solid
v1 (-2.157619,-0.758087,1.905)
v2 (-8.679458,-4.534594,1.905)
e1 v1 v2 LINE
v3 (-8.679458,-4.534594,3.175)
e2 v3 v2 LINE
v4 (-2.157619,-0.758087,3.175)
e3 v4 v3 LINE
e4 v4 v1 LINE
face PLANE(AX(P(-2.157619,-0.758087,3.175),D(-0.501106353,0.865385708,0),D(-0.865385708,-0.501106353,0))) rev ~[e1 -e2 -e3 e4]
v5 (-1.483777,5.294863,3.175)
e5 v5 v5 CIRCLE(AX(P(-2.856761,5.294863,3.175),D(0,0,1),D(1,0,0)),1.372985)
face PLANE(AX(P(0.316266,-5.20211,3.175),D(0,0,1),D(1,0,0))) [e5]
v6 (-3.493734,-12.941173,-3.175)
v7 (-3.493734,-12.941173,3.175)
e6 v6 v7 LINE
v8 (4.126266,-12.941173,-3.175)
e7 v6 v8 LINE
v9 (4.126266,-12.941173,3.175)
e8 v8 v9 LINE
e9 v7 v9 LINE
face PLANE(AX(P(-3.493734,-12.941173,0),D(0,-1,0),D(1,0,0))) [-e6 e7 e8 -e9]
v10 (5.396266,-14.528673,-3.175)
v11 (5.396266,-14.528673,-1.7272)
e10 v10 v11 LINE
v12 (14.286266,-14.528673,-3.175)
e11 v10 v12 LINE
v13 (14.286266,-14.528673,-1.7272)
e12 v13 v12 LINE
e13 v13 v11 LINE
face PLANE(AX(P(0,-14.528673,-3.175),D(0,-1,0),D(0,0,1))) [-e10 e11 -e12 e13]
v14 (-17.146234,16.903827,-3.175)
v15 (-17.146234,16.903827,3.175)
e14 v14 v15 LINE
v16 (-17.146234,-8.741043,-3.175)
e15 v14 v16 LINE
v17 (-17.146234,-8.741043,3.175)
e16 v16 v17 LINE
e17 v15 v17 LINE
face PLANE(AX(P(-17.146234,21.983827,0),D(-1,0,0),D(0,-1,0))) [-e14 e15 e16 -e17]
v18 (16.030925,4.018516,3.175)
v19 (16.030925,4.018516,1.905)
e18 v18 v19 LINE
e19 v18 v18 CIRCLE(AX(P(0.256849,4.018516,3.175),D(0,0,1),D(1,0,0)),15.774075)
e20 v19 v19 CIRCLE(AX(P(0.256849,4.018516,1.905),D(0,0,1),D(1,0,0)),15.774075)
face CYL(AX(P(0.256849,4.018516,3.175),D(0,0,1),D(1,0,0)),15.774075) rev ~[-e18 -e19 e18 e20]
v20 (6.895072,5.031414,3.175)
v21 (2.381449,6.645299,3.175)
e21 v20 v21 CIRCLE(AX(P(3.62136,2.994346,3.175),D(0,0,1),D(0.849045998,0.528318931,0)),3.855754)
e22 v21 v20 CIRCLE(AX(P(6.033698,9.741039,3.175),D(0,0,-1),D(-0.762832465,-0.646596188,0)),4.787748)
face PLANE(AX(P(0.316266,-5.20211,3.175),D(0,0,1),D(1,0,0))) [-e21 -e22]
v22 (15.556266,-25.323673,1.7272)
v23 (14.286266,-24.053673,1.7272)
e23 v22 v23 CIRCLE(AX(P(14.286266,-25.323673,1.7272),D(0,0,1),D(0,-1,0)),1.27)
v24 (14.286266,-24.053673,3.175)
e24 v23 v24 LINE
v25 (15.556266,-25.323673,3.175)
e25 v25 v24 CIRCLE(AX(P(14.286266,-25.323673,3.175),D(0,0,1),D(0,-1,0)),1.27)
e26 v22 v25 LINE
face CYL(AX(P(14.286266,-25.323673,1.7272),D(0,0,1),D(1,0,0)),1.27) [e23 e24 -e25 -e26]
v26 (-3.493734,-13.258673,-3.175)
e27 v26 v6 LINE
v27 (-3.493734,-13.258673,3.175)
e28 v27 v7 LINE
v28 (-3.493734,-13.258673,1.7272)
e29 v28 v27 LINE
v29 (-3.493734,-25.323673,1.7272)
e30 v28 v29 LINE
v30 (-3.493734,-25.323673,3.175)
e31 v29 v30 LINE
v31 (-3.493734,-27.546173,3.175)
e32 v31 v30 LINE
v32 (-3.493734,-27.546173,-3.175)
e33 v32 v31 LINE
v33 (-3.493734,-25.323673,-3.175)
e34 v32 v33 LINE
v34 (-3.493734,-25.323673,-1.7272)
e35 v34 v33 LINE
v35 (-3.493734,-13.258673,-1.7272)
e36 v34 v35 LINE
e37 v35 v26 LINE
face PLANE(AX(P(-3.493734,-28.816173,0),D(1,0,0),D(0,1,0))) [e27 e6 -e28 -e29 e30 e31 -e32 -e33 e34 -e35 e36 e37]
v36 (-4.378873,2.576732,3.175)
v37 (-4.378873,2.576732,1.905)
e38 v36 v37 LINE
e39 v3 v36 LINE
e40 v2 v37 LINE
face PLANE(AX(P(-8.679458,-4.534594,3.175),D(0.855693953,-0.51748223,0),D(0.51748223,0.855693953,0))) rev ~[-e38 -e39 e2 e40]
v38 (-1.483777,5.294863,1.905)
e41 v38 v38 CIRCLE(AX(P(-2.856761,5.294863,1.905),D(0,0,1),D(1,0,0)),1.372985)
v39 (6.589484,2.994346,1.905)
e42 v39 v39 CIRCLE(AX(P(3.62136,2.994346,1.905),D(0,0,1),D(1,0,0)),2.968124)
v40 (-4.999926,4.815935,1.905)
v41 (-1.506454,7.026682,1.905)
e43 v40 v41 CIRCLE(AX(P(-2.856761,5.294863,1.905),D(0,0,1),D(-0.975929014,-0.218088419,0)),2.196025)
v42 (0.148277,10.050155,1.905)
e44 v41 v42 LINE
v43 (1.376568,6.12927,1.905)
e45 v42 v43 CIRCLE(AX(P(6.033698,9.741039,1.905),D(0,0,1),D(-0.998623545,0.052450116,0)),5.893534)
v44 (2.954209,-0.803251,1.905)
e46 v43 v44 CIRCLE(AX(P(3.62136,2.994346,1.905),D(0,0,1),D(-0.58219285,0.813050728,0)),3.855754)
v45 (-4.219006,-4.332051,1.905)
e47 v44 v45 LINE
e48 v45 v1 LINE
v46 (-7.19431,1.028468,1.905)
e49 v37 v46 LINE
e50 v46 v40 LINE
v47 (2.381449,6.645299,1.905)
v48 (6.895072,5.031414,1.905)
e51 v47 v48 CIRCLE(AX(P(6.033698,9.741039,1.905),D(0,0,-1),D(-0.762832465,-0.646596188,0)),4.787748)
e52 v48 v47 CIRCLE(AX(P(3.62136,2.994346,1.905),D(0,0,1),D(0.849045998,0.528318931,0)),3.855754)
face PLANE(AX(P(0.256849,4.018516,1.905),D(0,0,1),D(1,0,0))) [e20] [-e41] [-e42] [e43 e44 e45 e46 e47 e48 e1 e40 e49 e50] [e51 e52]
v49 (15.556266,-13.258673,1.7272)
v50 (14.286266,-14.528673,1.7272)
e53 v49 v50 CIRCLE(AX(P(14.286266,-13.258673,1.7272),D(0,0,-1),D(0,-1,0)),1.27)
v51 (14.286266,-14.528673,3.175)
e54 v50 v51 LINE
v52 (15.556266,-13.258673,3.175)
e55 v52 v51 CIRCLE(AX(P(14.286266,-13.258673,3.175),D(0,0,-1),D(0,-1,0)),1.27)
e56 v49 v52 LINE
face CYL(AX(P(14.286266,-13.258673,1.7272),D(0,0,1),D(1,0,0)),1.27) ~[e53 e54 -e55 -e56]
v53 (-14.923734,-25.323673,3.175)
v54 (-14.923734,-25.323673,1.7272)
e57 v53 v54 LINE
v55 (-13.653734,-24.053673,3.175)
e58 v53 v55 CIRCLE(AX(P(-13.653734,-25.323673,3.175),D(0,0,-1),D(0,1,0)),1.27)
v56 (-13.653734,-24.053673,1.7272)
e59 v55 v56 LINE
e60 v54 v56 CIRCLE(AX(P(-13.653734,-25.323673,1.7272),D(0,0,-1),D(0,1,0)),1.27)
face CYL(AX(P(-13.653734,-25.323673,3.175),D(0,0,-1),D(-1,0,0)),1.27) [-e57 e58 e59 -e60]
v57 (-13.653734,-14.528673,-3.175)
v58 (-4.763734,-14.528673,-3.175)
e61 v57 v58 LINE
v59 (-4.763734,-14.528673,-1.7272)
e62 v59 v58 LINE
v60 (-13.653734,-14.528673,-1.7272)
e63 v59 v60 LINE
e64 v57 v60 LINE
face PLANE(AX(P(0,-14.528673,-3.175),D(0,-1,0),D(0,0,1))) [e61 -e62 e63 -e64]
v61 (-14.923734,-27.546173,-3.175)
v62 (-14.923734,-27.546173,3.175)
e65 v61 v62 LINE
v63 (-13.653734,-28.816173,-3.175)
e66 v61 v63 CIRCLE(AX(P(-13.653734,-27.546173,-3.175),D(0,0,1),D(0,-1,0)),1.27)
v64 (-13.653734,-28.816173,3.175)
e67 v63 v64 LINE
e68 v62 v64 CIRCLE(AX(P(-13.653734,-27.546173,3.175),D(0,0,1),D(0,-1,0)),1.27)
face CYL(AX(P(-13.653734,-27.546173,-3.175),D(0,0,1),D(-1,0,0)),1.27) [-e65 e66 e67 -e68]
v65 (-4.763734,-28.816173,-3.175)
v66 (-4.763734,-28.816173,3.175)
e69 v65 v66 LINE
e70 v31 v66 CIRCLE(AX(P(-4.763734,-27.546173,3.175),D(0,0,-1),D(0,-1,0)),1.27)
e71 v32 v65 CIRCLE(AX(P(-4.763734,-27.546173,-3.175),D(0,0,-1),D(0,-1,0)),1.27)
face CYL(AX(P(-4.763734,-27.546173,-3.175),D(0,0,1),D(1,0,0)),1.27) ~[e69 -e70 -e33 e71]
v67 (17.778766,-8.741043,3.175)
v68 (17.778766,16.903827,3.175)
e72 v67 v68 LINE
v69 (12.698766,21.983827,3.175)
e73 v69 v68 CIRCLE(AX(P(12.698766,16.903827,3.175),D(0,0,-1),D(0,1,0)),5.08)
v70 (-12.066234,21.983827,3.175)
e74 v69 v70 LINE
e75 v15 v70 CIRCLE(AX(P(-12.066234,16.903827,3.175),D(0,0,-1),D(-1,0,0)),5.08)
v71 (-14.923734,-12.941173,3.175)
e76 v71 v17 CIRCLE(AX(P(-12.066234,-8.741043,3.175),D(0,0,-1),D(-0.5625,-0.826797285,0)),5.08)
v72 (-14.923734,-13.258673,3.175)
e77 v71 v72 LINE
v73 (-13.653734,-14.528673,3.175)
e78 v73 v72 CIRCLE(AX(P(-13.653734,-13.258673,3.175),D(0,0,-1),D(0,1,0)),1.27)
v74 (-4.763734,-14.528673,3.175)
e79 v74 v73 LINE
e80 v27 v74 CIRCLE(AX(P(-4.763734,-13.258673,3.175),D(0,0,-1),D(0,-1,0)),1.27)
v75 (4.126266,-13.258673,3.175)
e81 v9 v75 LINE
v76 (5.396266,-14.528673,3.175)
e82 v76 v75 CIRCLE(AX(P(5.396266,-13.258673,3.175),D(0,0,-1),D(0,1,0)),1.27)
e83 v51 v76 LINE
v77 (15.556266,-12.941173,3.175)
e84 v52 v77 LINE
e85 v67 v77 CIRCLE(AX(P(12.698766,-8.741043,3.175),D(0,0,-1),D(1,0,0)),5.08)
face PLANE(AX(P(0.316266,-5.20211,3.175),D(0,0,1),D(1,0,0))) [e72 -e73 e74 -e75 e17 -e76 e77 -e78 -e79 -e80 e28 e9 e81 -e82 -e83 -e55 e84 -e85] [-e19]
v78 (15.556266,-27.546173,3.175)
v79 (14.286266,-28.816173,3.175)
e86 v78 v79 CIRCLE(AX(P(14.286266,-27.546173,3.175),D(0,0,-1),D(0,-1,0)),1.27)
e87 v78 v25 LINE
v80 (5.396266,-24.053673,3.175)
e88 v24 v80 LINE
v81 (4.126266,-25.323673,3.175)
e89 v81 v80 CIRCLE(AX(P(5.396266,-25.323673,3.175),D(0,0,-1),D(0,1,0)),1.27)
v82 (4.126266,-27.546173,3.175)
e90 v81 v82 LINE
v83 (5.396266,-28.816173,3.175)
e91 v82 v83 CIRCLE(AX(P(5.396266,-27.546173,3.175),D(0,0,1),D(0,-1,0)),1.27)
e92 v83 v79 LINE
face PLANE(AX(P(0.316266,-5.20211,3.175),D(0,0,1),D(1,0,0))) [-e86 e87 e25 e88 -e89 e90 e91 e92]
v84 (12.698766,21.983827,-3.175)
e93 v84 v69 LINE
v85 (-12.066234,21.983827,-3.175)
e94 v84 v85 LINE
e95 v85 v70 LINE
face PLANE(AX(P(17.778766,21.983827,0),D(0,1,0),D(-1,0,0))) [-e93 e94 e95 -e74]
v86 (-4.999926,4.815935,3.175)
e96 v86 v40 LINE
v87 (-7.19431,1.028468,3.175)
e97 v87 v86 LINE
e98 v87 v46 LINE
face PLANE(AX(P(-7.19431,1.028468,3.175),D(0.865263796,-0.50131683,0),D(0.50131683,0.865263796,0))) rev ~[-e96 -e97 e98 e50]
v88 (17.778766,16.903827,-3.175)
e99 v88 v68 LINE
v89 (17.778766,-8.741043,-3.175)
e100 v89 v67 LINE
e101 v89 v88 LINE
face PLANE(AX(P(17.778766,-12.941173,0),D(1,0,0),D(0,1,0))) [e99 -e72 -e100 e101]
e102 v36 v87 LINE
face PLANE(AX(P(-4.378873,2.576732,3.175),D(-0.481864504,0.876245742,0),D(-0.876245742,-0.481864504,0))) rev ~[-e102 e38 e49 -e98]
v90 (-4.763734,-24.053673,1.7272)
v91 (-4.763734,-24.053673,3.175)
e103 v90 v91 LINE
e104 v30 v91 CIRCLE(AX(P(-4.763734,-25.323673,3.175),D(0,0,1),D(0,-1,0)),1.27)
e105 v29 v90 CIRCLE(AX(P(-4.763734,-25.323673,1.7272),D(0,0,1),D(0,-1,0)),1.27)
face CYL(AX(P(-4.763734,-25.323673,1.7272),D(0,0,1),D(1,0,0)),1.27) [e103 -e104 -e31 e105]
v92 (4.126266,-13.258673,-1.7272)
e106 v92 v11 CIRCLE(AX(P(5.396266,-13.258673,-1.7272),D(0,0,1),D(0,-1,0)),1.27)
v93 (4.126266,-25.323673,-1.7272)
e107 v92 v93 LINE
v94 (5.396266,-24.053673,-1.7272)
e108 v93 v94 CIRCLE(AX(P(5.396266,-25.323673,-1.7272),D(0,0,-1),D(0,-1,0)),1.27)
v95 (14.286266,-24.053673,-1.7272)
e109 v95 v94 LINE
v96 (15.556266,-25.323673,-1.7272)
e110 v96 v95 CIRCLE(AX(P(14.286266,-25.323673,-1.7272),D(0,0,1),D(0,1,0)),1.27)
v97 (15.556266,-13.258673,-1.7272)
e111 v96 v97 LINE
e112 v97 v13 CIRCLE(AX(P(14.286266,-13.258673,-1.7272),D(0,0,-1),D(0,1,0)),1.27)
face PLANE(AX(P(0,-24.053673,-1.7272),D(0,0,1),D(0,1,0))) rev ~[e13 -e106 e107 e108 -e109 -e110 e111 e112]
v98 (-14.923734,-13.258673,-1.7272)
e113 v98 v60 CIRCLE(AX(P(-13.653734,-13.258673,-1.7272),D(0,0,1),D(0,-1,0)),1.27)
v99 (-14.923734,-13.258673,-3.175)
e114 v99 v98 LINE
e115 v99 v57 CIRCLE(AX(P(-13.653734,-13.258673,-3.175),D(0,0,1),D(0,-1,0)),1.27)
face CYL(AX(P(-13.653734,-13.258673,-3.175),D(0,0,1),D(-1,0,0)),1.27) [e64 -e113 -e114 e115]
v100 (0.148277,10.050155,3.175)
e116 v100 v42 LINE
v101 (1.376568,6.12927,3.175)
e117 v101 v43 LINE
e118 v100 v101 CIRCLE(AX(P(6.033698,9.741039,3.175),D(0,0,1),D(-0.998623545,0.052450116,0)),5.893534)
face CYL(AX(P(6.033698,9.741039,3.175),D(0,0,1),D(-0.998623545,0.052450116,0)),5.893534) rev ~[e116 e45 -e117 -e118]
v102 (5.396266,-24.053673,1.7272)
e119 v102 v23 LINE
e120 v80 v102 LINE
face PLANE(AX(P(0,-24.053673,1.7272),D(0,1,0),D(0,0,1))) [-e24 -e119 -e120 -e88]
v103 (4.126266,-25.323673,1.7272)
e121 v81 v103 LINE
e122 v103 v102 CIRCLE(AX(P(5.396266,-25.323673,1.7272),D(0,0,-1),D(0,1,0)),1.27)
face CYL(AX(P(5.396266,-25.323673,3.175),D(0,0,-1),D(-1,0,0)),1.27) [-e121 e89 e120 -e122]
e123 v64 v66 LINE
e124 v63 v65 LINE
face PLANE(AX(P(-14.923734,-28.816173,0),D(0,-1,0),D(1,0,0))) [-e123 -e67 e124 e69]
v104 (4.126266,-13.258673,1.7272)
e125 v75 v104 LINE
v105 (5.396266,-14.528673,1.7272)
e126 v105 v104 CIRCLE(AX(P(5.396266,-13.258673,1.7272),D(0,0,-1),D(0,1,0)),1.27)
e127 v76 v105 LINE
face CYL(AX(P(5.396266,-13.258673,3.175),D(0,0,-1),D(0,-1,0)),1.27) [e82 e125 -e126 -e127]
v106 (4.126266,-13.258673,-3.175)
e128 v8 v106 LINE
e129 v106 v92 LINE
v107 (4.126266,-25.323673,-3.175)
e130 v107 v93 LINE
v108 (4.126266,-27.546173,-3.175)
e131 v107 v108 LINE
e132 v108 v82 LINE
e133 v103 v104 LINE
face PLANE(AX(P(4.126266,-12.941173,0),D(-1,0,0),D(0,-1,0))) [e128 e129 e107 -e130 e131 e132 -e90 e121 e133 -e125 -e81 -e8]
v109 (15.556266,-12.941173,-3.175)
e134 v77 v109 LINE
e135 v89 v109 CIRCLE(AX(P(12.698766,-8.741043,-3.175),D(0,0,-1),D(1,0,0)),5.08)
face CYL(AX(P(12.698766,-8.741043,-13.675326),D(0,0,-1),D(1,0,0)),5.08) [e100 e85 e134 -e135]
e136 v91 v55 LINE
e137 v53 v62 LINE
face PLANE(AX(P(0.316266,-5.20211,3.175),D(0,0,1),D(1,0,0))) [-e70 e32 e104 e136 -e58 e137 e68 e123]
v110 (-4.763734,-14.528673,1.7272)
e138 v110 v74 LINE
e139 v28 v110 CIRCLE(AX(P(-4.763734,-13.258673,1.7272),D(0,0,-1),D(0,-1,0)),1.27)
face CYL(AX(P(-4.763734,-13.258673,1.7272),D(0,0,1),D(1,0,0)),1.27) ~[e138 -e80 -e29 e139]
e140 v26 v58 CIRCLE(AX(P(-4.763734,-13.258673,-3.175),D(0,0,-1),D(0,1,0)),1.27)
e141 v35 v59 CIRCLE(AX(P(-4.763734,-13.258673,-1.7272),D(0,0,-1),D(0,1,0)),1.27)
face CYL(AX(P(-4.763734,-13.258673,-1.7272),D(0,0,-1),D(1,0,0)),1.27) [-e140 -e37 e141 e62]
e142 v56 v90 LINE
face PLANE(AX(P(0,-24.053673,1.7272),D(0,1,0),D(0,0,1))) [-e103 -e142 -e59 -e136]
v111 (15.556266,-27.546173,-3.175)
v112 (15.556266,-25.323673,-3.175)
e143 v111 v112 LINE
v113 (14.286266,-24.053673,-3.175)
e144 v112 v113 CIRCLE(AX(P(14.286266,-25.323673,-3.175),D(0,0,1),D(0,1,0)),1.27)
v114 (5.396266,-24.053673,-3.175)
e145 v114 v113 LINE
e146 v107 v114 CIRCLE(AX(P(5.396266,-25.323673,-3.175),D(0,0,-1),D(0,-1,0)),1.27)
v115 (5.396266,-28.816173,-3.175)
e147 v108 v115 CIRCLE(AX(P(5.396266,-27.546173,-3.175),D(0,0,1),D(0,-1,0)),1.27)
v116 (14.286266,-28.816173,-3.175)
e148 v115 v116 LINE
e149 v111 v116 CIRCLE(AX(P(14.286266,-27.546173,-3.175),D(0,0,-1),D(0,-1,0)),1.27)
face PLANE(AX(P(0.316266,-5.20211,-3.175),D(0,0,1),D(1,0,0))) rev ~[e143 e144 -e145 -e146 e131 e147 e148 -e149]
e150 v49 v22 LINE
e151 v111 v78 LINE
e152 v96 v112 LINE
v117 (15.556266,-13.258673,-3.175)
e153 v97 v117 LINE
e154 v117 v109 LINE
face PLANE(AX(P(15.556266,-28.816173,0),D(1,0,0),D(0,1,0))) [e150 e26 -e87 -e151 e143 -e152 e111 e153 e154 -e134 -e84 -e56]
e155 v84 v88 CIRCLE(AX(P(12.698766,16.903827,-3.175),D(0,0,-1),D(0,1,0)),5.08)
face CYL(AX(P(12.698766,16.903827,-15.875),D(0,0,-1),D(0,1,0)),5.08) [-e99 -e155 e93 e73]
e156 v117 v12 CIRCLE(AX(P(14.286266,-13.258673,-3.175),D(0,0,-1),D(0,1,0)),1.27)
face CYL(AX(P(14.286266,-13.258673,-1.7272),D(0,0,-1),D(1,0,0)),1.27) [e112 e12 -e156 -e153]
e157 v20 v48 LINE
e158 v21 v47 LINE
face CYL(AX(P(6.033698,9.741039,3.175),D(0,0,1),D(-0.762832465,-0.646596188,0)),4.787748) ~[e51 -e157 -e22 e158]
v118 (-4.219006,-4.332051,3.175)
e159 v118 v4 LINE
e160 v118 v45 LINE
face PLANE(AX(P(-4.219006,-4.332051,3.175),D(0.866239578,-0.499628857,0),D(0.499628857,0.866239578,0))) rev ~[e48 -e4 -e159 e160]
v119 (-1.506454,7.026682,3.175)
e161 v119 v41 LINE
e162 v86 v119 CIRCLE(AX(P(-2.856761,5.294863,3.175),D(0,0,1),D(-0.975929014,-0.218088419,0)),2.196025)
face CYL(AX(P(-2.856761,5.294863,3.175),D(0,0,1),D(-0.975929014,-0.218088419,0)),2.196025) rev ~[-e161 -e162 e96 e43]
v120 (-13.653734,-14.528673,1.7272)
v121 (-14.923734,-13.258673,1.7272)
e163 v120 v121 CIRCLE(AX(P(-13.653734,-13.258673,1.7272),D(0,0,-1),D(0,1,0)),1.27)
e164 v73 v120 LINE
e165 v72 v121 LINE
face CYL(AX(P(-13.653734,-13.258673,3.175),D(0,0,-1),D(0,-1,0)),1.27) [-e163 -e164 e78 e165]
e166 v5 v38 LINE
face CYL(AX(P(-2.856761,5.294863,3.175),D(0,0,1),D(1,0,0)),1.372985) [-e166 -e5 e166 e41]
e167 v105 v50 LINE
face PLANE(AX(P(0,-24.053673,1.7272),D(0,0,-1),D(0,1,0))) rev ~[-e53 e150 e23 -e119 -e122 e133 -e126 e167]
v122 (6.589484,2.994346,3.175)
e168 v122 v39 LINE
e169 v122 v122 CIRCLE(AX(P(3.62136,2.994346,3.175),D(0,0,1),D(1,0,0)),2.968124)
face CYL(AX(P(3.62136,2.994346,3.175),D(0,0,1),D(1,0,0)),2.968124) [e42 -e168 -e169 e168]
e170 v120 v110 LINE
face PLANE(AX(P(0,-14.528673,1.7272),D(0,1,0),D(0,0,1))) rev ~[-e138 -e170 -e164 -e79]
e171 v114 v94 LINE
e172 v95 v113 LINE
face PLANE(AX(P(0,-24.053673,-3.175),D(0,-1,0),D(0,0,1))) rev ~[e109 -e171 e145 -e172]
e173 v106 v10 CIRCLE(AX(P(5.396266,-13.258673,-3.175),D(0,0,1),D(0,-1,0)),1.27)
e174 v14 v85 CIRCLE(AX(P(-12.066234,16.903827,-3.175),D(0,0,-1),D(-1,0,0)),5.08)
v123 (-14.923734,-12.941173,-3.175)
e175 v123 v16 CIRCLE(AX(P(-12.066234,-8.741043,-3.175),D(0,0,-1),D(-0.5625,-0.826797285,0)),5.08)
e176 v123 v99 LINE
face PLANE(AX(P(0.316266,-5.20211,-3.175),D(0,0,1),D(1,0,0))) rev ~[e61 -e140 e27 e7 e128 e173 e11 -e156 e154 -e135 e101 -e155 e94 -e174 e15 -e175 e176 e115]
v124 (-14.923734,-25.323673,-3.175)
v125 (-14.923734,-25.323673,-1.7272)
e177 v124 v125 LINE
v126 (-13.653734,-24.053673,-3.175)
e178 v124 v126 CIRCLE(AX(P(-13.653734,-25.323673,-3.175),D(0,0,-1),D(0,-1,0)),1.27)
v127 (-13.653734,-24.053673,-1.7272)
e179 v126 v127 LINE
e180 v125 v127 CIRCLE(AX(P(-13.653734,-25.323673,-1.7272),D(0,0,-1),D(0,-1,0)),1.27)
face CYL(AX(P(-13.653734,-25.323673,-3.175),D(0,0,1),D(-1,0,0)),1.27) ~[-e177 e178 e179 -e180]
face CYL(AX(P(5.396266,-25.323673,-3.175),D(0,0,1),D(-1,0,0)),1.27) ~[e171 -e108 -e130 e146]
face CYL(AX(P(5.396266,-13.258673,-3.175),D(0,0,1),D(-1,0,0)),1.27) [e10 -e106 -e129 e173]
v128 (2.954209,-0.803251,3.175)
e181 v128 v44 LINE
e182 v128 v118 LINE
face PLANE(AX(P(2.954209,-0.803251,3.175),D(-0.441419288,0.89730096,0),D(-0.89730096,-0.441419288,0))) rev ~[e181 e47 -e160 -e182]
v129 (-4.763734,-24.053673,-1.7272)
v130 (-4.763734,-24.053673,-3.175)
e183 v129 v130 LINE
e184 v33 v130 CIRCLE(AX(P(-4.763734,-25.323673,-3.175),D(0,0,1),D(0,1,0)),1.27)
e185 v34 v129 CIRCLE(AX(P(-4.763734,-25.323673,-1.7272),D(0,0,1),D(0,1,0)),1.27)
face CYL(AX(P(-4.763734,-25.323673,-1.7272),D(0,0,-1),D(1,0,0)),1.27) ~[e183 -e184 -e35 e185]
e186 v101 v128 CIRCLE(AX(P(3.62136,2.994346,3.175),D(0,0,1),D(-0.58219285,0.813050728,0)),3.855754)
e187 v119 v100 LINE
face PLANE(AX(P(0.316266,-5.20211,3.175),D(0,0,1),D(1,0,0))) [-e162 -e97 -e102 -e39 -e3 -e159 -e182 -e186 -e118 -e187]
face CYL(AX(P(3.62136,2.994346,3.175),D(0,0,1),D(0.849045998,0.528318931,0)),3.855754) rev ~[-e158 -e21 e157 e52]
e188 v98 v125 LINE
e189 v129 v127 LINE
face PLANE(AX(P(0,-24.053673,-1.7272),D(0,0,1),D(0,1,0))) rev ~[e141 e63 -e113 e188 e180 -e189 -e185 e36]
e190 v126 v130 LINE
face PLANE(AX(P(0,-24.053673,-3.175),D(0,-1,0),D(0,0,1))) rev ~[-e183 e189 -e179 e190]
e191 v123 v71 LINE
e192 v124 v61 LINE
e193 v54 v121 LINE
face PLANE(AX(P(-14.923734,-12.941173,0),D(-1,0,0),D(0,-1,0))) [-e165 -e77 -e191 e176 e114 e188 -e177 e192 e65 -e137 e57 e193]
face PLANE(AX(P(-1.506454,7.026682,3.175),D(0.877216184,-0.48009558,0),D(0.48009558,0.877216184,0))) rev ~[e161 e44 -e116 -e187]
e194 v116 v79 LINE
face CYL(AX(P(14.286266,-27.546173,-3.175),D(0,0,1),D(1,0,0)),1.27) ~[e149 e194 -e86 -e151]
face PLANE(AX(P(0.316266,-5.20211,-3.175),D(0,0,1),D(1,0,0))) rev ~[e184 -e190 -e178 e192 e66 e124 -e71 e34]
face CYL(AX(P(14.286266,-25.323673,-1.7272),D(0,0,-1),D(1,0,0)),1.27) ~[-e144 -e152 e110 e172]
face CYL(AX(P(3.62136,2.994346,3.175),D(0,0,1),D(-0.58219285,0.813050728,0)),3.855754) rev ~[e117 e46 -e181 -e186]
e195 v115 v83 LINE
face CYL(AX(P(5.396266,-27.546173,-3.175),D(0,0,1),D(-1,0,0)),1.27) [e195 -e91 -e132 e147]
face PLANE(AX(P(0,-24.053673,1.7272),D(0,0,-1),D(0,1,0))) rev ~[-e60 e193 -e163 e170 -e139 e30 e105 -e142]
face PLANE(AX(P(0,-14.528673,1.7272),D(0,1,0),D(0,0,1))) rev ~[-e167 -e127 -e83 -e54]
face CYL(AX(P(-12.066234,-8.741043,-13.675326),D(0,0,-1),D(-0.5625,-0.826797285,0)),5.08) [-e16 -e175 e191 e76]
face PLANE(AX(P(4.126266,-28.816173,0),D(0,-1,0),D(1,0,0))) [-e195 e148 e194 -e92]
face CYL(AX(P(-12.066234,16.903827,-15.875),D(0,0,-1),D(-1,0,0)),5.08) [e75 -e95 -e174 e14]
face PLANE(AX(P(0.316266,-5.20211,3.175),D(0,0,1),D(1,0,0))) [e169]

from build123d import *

# Parameters (mm, degrees)
F1_DEPTH    = 3.175
F2_W        = 9.525
F2_H        = 1.4478
F3_DEPTH    = 25.4
F4_R        = 15.7740752149
F4_R_2      = 2.9681243023
F4_R_3      = 1.3729847112
F5_DEPTH    = 1.27
F6_T1_DEPTH = 31.75
F6_T3_DEPTH = 27.3506510316
F7_R        = 1.27


# Not quite as in the source:
# - a fillet or chamfer that OpenCascade refuses, or shapes differently, is made with other operations: its cross-section is extruded or revolved along the edge and cut away or added


with BuildPart() as f1:
    # F0 (on Top) → F1 (new body, symmetric)
    with BuildSketch(Plane.XY):
        Polygon((17.7787664203, 21.9838270611), (-17.1462335797, 21.9838270611), (-17.1462335797, -12.9411729389), (-14.9237335797, -12.9411729389), (-14.9237335797, -28.8161729389), (-3.4937335797, -28.8161729389), (-3.4937335797, -12.9411729389), (4.1262664203, -12.9411729389), (4.1262664203, -28.8161729389), (15.5562664203, -28.8161729389), (15.5562664203, -12.9411729389), (17.7787664203, -12.9411729389), align=None)
    extrude(amount=F1_DEPTH, both=True)

    # F2 (on Right) → F3 (cut, symmetric)
    with BuildSketch(Plane.YZ):
        with Locations((-19.2911729389, -2.4511)):
            Rectangle(F2_W, F2_H)
        with Locations((-19.2911729389, 2.4511)):
            Rectangle(F2_W, F2_H)
    extrude(amount=F3_DEPTH, both=True, mode=Mode.SUBTRACT)

    # F4 (on face) → F5 (cut)
    with BuildSketch(Plane.XY.offset(3.175)):
        with Locations((0.2568493655, 4.0185162798)):
            Circle(F4_R)
        with BuildLine():
            Line((-1.5064536128, 7.0266816765), (0.1482767001, 10.0501550651))
            ThreePointArc((0.1482767001, 10.0501550651), (0.4096706183, 7.9792062399), (1.3765677405, 6.1292695458))
            ThreePointArc((1.3765677405, 6.1292695458), (-0.1382695754, 2.1387635418), (2.9542085605, -0.8032509449))
            Line((2.9542085605, -0.8032509449), (-4.2190060268, -4.3320505521))
            Line((-4.2190060268, -4.3320505521), (-2.1576185001, -0.7580867248))
            Line((-2.1576185001, -0.7580867248), (-8.6794582017, -4.5345938661))
            Line((-8.6794582017, -4.5345938661), (-4.3788731984, 2.5767316464))
            Line((-4.3788731984, 2.5767316464), (-7.1943101482, 1.0284683409))
            Line((-7.1943101482, 1.0284683409), (-4.9999261676, 4.815935468))
            ThreePointArc((-4.9999261676, 4.815935468), (-1.6824509255, 3.4391903431), (-1.5064536128, 7.0266816765))
        make_face(mode=Mode.SUBTRACT)
        with Locations((3.6213599069, 2.9943462909)):
            Circle(F4_R_2, mode=Mode.SUBTRACT)
        with Locations((-2.8567614499, 5.2948631346)):
            Circle(F4_R_3, mode=Mode.SUBTRACT)
        with BuildLine():
            ThreePointArc((2.3814487819, 6.6452990552), (7.6456545146, 14.2492672348), (6.8950720548, 5.0314139032))
            ThreePointArc((6.8950720548, 5.0314139032), (4.9195289911, 6.6249926126), (2.3814487819, 6.6452990552))
        make_face(mode=Mode.SUBTRACT)
    extrude(amount=-F5_DEPTH, mode=Mode.SUBTRACT)

    # F6: fillet of radius 5.08 on 4 edges, made by hand

    # F6_s2 → F6_t1 (cut)
    with BuildSketch(Plane.XY.offset(-15.875)):
        with BuildLine():
            ThreePointArc((12.6987664203, 21.9838270611), (16.2908688687, 20.4959295096), (17.7787664203, 16.9038270611))
            Line((17.7787664203, 16.9038270611), (17.7787664203, 21.9838270611))
            Line((17.7787664203, 21.9838270611), (12.6987664203, 21.9838270611))
        make_face()
        with BuildLine():
            ThreePointArc((-17.1462335797, 16.9038270611), (-15.6583360282, 20.4959295096), (-12.0662335797, 21.9838270611))
            Line((-12.0662335797, 21.9838270611), (-17.1462335797, 21.9838270611))
            Line((-17.1462335797, 21.9838270611), (-17.1462335797, 16.9038270611))
        make_face()
    extrude(amount=F6_T1_DEPTH, mode=Mode.SUBTRACT)

    # F6_s4 → F6_t3 (cut)
    with BuildSketch(Plane.XY.offset(-13.6753255158)):
        with BuildLine():
            ThreePointArc((-14.9237335797, -12.9411729388), (-16.5563616403, -11.1169951731), (-17.1462335797, -8.7410427325))
            Line((-17.1462335797, -8.7410427325), (-17.1462335797, -12.9411729389))
            Line((-17.1462335797, -12.9411729389), (-14.9237335797, -12.9411729388))
        make_face()
        with BuildLine():
            ThreePointArc((17.7787664203, -8.7410427325), (17.1888944808, -11.1169951731), (15.5562664203, -12.9411729388))
            Line((15.5562664203, -12.9411729388), (17.7787664203, -12.9411729389))
            Line((17.7787664203, -12.9411729389), (17.7787664203, -8.7410427325))
        make_face()
    extrude(amount=F6_T3_DEPTH, mode=Mode.SUBTRACT)

    # F7
    f7_edges = [f1.edges().sort_by_distance(p)[0] for p in [
        (-14.923734, -14.528673, 2.4511),
        (-3.493734, -14.528673, 2.4511),
        (15.556266, -14.528673, 2.4511),
        (4.126266, -14.528673, 2.4511),
        (15.556266, -14.528673, -2.4511),
        (4.126266, -14.528673, -2.4511),
        (-14.923734, -14.528673, -2.4511),
        (-3.493734, -14.528673, -2.4511),
        (-3.493734, -24.053673, -2.4511),
        (-3.493734, -24.053673, 2.4511),
        (15.556266, -24.053673, -2.4511),
        (15.556266, -24.053673, 2.4511),
        (15.556266, -28.816173, 0),
        (4.126266, -28.816173, 0),
        (-3.493734, -28.816173, 0),
        (-14.923734, -28.816173, 0),
        (-14.923734, -24.053673, 2.4511),
        (-14.923734, -24.053673, -2.4511),
        (4.126266, -24.053673, 2.4511),
        (4.126266, -24.053673, -2.4511),
    ]]
    fillet(f7_edges, radius=F7_R)


solid = f1.part
